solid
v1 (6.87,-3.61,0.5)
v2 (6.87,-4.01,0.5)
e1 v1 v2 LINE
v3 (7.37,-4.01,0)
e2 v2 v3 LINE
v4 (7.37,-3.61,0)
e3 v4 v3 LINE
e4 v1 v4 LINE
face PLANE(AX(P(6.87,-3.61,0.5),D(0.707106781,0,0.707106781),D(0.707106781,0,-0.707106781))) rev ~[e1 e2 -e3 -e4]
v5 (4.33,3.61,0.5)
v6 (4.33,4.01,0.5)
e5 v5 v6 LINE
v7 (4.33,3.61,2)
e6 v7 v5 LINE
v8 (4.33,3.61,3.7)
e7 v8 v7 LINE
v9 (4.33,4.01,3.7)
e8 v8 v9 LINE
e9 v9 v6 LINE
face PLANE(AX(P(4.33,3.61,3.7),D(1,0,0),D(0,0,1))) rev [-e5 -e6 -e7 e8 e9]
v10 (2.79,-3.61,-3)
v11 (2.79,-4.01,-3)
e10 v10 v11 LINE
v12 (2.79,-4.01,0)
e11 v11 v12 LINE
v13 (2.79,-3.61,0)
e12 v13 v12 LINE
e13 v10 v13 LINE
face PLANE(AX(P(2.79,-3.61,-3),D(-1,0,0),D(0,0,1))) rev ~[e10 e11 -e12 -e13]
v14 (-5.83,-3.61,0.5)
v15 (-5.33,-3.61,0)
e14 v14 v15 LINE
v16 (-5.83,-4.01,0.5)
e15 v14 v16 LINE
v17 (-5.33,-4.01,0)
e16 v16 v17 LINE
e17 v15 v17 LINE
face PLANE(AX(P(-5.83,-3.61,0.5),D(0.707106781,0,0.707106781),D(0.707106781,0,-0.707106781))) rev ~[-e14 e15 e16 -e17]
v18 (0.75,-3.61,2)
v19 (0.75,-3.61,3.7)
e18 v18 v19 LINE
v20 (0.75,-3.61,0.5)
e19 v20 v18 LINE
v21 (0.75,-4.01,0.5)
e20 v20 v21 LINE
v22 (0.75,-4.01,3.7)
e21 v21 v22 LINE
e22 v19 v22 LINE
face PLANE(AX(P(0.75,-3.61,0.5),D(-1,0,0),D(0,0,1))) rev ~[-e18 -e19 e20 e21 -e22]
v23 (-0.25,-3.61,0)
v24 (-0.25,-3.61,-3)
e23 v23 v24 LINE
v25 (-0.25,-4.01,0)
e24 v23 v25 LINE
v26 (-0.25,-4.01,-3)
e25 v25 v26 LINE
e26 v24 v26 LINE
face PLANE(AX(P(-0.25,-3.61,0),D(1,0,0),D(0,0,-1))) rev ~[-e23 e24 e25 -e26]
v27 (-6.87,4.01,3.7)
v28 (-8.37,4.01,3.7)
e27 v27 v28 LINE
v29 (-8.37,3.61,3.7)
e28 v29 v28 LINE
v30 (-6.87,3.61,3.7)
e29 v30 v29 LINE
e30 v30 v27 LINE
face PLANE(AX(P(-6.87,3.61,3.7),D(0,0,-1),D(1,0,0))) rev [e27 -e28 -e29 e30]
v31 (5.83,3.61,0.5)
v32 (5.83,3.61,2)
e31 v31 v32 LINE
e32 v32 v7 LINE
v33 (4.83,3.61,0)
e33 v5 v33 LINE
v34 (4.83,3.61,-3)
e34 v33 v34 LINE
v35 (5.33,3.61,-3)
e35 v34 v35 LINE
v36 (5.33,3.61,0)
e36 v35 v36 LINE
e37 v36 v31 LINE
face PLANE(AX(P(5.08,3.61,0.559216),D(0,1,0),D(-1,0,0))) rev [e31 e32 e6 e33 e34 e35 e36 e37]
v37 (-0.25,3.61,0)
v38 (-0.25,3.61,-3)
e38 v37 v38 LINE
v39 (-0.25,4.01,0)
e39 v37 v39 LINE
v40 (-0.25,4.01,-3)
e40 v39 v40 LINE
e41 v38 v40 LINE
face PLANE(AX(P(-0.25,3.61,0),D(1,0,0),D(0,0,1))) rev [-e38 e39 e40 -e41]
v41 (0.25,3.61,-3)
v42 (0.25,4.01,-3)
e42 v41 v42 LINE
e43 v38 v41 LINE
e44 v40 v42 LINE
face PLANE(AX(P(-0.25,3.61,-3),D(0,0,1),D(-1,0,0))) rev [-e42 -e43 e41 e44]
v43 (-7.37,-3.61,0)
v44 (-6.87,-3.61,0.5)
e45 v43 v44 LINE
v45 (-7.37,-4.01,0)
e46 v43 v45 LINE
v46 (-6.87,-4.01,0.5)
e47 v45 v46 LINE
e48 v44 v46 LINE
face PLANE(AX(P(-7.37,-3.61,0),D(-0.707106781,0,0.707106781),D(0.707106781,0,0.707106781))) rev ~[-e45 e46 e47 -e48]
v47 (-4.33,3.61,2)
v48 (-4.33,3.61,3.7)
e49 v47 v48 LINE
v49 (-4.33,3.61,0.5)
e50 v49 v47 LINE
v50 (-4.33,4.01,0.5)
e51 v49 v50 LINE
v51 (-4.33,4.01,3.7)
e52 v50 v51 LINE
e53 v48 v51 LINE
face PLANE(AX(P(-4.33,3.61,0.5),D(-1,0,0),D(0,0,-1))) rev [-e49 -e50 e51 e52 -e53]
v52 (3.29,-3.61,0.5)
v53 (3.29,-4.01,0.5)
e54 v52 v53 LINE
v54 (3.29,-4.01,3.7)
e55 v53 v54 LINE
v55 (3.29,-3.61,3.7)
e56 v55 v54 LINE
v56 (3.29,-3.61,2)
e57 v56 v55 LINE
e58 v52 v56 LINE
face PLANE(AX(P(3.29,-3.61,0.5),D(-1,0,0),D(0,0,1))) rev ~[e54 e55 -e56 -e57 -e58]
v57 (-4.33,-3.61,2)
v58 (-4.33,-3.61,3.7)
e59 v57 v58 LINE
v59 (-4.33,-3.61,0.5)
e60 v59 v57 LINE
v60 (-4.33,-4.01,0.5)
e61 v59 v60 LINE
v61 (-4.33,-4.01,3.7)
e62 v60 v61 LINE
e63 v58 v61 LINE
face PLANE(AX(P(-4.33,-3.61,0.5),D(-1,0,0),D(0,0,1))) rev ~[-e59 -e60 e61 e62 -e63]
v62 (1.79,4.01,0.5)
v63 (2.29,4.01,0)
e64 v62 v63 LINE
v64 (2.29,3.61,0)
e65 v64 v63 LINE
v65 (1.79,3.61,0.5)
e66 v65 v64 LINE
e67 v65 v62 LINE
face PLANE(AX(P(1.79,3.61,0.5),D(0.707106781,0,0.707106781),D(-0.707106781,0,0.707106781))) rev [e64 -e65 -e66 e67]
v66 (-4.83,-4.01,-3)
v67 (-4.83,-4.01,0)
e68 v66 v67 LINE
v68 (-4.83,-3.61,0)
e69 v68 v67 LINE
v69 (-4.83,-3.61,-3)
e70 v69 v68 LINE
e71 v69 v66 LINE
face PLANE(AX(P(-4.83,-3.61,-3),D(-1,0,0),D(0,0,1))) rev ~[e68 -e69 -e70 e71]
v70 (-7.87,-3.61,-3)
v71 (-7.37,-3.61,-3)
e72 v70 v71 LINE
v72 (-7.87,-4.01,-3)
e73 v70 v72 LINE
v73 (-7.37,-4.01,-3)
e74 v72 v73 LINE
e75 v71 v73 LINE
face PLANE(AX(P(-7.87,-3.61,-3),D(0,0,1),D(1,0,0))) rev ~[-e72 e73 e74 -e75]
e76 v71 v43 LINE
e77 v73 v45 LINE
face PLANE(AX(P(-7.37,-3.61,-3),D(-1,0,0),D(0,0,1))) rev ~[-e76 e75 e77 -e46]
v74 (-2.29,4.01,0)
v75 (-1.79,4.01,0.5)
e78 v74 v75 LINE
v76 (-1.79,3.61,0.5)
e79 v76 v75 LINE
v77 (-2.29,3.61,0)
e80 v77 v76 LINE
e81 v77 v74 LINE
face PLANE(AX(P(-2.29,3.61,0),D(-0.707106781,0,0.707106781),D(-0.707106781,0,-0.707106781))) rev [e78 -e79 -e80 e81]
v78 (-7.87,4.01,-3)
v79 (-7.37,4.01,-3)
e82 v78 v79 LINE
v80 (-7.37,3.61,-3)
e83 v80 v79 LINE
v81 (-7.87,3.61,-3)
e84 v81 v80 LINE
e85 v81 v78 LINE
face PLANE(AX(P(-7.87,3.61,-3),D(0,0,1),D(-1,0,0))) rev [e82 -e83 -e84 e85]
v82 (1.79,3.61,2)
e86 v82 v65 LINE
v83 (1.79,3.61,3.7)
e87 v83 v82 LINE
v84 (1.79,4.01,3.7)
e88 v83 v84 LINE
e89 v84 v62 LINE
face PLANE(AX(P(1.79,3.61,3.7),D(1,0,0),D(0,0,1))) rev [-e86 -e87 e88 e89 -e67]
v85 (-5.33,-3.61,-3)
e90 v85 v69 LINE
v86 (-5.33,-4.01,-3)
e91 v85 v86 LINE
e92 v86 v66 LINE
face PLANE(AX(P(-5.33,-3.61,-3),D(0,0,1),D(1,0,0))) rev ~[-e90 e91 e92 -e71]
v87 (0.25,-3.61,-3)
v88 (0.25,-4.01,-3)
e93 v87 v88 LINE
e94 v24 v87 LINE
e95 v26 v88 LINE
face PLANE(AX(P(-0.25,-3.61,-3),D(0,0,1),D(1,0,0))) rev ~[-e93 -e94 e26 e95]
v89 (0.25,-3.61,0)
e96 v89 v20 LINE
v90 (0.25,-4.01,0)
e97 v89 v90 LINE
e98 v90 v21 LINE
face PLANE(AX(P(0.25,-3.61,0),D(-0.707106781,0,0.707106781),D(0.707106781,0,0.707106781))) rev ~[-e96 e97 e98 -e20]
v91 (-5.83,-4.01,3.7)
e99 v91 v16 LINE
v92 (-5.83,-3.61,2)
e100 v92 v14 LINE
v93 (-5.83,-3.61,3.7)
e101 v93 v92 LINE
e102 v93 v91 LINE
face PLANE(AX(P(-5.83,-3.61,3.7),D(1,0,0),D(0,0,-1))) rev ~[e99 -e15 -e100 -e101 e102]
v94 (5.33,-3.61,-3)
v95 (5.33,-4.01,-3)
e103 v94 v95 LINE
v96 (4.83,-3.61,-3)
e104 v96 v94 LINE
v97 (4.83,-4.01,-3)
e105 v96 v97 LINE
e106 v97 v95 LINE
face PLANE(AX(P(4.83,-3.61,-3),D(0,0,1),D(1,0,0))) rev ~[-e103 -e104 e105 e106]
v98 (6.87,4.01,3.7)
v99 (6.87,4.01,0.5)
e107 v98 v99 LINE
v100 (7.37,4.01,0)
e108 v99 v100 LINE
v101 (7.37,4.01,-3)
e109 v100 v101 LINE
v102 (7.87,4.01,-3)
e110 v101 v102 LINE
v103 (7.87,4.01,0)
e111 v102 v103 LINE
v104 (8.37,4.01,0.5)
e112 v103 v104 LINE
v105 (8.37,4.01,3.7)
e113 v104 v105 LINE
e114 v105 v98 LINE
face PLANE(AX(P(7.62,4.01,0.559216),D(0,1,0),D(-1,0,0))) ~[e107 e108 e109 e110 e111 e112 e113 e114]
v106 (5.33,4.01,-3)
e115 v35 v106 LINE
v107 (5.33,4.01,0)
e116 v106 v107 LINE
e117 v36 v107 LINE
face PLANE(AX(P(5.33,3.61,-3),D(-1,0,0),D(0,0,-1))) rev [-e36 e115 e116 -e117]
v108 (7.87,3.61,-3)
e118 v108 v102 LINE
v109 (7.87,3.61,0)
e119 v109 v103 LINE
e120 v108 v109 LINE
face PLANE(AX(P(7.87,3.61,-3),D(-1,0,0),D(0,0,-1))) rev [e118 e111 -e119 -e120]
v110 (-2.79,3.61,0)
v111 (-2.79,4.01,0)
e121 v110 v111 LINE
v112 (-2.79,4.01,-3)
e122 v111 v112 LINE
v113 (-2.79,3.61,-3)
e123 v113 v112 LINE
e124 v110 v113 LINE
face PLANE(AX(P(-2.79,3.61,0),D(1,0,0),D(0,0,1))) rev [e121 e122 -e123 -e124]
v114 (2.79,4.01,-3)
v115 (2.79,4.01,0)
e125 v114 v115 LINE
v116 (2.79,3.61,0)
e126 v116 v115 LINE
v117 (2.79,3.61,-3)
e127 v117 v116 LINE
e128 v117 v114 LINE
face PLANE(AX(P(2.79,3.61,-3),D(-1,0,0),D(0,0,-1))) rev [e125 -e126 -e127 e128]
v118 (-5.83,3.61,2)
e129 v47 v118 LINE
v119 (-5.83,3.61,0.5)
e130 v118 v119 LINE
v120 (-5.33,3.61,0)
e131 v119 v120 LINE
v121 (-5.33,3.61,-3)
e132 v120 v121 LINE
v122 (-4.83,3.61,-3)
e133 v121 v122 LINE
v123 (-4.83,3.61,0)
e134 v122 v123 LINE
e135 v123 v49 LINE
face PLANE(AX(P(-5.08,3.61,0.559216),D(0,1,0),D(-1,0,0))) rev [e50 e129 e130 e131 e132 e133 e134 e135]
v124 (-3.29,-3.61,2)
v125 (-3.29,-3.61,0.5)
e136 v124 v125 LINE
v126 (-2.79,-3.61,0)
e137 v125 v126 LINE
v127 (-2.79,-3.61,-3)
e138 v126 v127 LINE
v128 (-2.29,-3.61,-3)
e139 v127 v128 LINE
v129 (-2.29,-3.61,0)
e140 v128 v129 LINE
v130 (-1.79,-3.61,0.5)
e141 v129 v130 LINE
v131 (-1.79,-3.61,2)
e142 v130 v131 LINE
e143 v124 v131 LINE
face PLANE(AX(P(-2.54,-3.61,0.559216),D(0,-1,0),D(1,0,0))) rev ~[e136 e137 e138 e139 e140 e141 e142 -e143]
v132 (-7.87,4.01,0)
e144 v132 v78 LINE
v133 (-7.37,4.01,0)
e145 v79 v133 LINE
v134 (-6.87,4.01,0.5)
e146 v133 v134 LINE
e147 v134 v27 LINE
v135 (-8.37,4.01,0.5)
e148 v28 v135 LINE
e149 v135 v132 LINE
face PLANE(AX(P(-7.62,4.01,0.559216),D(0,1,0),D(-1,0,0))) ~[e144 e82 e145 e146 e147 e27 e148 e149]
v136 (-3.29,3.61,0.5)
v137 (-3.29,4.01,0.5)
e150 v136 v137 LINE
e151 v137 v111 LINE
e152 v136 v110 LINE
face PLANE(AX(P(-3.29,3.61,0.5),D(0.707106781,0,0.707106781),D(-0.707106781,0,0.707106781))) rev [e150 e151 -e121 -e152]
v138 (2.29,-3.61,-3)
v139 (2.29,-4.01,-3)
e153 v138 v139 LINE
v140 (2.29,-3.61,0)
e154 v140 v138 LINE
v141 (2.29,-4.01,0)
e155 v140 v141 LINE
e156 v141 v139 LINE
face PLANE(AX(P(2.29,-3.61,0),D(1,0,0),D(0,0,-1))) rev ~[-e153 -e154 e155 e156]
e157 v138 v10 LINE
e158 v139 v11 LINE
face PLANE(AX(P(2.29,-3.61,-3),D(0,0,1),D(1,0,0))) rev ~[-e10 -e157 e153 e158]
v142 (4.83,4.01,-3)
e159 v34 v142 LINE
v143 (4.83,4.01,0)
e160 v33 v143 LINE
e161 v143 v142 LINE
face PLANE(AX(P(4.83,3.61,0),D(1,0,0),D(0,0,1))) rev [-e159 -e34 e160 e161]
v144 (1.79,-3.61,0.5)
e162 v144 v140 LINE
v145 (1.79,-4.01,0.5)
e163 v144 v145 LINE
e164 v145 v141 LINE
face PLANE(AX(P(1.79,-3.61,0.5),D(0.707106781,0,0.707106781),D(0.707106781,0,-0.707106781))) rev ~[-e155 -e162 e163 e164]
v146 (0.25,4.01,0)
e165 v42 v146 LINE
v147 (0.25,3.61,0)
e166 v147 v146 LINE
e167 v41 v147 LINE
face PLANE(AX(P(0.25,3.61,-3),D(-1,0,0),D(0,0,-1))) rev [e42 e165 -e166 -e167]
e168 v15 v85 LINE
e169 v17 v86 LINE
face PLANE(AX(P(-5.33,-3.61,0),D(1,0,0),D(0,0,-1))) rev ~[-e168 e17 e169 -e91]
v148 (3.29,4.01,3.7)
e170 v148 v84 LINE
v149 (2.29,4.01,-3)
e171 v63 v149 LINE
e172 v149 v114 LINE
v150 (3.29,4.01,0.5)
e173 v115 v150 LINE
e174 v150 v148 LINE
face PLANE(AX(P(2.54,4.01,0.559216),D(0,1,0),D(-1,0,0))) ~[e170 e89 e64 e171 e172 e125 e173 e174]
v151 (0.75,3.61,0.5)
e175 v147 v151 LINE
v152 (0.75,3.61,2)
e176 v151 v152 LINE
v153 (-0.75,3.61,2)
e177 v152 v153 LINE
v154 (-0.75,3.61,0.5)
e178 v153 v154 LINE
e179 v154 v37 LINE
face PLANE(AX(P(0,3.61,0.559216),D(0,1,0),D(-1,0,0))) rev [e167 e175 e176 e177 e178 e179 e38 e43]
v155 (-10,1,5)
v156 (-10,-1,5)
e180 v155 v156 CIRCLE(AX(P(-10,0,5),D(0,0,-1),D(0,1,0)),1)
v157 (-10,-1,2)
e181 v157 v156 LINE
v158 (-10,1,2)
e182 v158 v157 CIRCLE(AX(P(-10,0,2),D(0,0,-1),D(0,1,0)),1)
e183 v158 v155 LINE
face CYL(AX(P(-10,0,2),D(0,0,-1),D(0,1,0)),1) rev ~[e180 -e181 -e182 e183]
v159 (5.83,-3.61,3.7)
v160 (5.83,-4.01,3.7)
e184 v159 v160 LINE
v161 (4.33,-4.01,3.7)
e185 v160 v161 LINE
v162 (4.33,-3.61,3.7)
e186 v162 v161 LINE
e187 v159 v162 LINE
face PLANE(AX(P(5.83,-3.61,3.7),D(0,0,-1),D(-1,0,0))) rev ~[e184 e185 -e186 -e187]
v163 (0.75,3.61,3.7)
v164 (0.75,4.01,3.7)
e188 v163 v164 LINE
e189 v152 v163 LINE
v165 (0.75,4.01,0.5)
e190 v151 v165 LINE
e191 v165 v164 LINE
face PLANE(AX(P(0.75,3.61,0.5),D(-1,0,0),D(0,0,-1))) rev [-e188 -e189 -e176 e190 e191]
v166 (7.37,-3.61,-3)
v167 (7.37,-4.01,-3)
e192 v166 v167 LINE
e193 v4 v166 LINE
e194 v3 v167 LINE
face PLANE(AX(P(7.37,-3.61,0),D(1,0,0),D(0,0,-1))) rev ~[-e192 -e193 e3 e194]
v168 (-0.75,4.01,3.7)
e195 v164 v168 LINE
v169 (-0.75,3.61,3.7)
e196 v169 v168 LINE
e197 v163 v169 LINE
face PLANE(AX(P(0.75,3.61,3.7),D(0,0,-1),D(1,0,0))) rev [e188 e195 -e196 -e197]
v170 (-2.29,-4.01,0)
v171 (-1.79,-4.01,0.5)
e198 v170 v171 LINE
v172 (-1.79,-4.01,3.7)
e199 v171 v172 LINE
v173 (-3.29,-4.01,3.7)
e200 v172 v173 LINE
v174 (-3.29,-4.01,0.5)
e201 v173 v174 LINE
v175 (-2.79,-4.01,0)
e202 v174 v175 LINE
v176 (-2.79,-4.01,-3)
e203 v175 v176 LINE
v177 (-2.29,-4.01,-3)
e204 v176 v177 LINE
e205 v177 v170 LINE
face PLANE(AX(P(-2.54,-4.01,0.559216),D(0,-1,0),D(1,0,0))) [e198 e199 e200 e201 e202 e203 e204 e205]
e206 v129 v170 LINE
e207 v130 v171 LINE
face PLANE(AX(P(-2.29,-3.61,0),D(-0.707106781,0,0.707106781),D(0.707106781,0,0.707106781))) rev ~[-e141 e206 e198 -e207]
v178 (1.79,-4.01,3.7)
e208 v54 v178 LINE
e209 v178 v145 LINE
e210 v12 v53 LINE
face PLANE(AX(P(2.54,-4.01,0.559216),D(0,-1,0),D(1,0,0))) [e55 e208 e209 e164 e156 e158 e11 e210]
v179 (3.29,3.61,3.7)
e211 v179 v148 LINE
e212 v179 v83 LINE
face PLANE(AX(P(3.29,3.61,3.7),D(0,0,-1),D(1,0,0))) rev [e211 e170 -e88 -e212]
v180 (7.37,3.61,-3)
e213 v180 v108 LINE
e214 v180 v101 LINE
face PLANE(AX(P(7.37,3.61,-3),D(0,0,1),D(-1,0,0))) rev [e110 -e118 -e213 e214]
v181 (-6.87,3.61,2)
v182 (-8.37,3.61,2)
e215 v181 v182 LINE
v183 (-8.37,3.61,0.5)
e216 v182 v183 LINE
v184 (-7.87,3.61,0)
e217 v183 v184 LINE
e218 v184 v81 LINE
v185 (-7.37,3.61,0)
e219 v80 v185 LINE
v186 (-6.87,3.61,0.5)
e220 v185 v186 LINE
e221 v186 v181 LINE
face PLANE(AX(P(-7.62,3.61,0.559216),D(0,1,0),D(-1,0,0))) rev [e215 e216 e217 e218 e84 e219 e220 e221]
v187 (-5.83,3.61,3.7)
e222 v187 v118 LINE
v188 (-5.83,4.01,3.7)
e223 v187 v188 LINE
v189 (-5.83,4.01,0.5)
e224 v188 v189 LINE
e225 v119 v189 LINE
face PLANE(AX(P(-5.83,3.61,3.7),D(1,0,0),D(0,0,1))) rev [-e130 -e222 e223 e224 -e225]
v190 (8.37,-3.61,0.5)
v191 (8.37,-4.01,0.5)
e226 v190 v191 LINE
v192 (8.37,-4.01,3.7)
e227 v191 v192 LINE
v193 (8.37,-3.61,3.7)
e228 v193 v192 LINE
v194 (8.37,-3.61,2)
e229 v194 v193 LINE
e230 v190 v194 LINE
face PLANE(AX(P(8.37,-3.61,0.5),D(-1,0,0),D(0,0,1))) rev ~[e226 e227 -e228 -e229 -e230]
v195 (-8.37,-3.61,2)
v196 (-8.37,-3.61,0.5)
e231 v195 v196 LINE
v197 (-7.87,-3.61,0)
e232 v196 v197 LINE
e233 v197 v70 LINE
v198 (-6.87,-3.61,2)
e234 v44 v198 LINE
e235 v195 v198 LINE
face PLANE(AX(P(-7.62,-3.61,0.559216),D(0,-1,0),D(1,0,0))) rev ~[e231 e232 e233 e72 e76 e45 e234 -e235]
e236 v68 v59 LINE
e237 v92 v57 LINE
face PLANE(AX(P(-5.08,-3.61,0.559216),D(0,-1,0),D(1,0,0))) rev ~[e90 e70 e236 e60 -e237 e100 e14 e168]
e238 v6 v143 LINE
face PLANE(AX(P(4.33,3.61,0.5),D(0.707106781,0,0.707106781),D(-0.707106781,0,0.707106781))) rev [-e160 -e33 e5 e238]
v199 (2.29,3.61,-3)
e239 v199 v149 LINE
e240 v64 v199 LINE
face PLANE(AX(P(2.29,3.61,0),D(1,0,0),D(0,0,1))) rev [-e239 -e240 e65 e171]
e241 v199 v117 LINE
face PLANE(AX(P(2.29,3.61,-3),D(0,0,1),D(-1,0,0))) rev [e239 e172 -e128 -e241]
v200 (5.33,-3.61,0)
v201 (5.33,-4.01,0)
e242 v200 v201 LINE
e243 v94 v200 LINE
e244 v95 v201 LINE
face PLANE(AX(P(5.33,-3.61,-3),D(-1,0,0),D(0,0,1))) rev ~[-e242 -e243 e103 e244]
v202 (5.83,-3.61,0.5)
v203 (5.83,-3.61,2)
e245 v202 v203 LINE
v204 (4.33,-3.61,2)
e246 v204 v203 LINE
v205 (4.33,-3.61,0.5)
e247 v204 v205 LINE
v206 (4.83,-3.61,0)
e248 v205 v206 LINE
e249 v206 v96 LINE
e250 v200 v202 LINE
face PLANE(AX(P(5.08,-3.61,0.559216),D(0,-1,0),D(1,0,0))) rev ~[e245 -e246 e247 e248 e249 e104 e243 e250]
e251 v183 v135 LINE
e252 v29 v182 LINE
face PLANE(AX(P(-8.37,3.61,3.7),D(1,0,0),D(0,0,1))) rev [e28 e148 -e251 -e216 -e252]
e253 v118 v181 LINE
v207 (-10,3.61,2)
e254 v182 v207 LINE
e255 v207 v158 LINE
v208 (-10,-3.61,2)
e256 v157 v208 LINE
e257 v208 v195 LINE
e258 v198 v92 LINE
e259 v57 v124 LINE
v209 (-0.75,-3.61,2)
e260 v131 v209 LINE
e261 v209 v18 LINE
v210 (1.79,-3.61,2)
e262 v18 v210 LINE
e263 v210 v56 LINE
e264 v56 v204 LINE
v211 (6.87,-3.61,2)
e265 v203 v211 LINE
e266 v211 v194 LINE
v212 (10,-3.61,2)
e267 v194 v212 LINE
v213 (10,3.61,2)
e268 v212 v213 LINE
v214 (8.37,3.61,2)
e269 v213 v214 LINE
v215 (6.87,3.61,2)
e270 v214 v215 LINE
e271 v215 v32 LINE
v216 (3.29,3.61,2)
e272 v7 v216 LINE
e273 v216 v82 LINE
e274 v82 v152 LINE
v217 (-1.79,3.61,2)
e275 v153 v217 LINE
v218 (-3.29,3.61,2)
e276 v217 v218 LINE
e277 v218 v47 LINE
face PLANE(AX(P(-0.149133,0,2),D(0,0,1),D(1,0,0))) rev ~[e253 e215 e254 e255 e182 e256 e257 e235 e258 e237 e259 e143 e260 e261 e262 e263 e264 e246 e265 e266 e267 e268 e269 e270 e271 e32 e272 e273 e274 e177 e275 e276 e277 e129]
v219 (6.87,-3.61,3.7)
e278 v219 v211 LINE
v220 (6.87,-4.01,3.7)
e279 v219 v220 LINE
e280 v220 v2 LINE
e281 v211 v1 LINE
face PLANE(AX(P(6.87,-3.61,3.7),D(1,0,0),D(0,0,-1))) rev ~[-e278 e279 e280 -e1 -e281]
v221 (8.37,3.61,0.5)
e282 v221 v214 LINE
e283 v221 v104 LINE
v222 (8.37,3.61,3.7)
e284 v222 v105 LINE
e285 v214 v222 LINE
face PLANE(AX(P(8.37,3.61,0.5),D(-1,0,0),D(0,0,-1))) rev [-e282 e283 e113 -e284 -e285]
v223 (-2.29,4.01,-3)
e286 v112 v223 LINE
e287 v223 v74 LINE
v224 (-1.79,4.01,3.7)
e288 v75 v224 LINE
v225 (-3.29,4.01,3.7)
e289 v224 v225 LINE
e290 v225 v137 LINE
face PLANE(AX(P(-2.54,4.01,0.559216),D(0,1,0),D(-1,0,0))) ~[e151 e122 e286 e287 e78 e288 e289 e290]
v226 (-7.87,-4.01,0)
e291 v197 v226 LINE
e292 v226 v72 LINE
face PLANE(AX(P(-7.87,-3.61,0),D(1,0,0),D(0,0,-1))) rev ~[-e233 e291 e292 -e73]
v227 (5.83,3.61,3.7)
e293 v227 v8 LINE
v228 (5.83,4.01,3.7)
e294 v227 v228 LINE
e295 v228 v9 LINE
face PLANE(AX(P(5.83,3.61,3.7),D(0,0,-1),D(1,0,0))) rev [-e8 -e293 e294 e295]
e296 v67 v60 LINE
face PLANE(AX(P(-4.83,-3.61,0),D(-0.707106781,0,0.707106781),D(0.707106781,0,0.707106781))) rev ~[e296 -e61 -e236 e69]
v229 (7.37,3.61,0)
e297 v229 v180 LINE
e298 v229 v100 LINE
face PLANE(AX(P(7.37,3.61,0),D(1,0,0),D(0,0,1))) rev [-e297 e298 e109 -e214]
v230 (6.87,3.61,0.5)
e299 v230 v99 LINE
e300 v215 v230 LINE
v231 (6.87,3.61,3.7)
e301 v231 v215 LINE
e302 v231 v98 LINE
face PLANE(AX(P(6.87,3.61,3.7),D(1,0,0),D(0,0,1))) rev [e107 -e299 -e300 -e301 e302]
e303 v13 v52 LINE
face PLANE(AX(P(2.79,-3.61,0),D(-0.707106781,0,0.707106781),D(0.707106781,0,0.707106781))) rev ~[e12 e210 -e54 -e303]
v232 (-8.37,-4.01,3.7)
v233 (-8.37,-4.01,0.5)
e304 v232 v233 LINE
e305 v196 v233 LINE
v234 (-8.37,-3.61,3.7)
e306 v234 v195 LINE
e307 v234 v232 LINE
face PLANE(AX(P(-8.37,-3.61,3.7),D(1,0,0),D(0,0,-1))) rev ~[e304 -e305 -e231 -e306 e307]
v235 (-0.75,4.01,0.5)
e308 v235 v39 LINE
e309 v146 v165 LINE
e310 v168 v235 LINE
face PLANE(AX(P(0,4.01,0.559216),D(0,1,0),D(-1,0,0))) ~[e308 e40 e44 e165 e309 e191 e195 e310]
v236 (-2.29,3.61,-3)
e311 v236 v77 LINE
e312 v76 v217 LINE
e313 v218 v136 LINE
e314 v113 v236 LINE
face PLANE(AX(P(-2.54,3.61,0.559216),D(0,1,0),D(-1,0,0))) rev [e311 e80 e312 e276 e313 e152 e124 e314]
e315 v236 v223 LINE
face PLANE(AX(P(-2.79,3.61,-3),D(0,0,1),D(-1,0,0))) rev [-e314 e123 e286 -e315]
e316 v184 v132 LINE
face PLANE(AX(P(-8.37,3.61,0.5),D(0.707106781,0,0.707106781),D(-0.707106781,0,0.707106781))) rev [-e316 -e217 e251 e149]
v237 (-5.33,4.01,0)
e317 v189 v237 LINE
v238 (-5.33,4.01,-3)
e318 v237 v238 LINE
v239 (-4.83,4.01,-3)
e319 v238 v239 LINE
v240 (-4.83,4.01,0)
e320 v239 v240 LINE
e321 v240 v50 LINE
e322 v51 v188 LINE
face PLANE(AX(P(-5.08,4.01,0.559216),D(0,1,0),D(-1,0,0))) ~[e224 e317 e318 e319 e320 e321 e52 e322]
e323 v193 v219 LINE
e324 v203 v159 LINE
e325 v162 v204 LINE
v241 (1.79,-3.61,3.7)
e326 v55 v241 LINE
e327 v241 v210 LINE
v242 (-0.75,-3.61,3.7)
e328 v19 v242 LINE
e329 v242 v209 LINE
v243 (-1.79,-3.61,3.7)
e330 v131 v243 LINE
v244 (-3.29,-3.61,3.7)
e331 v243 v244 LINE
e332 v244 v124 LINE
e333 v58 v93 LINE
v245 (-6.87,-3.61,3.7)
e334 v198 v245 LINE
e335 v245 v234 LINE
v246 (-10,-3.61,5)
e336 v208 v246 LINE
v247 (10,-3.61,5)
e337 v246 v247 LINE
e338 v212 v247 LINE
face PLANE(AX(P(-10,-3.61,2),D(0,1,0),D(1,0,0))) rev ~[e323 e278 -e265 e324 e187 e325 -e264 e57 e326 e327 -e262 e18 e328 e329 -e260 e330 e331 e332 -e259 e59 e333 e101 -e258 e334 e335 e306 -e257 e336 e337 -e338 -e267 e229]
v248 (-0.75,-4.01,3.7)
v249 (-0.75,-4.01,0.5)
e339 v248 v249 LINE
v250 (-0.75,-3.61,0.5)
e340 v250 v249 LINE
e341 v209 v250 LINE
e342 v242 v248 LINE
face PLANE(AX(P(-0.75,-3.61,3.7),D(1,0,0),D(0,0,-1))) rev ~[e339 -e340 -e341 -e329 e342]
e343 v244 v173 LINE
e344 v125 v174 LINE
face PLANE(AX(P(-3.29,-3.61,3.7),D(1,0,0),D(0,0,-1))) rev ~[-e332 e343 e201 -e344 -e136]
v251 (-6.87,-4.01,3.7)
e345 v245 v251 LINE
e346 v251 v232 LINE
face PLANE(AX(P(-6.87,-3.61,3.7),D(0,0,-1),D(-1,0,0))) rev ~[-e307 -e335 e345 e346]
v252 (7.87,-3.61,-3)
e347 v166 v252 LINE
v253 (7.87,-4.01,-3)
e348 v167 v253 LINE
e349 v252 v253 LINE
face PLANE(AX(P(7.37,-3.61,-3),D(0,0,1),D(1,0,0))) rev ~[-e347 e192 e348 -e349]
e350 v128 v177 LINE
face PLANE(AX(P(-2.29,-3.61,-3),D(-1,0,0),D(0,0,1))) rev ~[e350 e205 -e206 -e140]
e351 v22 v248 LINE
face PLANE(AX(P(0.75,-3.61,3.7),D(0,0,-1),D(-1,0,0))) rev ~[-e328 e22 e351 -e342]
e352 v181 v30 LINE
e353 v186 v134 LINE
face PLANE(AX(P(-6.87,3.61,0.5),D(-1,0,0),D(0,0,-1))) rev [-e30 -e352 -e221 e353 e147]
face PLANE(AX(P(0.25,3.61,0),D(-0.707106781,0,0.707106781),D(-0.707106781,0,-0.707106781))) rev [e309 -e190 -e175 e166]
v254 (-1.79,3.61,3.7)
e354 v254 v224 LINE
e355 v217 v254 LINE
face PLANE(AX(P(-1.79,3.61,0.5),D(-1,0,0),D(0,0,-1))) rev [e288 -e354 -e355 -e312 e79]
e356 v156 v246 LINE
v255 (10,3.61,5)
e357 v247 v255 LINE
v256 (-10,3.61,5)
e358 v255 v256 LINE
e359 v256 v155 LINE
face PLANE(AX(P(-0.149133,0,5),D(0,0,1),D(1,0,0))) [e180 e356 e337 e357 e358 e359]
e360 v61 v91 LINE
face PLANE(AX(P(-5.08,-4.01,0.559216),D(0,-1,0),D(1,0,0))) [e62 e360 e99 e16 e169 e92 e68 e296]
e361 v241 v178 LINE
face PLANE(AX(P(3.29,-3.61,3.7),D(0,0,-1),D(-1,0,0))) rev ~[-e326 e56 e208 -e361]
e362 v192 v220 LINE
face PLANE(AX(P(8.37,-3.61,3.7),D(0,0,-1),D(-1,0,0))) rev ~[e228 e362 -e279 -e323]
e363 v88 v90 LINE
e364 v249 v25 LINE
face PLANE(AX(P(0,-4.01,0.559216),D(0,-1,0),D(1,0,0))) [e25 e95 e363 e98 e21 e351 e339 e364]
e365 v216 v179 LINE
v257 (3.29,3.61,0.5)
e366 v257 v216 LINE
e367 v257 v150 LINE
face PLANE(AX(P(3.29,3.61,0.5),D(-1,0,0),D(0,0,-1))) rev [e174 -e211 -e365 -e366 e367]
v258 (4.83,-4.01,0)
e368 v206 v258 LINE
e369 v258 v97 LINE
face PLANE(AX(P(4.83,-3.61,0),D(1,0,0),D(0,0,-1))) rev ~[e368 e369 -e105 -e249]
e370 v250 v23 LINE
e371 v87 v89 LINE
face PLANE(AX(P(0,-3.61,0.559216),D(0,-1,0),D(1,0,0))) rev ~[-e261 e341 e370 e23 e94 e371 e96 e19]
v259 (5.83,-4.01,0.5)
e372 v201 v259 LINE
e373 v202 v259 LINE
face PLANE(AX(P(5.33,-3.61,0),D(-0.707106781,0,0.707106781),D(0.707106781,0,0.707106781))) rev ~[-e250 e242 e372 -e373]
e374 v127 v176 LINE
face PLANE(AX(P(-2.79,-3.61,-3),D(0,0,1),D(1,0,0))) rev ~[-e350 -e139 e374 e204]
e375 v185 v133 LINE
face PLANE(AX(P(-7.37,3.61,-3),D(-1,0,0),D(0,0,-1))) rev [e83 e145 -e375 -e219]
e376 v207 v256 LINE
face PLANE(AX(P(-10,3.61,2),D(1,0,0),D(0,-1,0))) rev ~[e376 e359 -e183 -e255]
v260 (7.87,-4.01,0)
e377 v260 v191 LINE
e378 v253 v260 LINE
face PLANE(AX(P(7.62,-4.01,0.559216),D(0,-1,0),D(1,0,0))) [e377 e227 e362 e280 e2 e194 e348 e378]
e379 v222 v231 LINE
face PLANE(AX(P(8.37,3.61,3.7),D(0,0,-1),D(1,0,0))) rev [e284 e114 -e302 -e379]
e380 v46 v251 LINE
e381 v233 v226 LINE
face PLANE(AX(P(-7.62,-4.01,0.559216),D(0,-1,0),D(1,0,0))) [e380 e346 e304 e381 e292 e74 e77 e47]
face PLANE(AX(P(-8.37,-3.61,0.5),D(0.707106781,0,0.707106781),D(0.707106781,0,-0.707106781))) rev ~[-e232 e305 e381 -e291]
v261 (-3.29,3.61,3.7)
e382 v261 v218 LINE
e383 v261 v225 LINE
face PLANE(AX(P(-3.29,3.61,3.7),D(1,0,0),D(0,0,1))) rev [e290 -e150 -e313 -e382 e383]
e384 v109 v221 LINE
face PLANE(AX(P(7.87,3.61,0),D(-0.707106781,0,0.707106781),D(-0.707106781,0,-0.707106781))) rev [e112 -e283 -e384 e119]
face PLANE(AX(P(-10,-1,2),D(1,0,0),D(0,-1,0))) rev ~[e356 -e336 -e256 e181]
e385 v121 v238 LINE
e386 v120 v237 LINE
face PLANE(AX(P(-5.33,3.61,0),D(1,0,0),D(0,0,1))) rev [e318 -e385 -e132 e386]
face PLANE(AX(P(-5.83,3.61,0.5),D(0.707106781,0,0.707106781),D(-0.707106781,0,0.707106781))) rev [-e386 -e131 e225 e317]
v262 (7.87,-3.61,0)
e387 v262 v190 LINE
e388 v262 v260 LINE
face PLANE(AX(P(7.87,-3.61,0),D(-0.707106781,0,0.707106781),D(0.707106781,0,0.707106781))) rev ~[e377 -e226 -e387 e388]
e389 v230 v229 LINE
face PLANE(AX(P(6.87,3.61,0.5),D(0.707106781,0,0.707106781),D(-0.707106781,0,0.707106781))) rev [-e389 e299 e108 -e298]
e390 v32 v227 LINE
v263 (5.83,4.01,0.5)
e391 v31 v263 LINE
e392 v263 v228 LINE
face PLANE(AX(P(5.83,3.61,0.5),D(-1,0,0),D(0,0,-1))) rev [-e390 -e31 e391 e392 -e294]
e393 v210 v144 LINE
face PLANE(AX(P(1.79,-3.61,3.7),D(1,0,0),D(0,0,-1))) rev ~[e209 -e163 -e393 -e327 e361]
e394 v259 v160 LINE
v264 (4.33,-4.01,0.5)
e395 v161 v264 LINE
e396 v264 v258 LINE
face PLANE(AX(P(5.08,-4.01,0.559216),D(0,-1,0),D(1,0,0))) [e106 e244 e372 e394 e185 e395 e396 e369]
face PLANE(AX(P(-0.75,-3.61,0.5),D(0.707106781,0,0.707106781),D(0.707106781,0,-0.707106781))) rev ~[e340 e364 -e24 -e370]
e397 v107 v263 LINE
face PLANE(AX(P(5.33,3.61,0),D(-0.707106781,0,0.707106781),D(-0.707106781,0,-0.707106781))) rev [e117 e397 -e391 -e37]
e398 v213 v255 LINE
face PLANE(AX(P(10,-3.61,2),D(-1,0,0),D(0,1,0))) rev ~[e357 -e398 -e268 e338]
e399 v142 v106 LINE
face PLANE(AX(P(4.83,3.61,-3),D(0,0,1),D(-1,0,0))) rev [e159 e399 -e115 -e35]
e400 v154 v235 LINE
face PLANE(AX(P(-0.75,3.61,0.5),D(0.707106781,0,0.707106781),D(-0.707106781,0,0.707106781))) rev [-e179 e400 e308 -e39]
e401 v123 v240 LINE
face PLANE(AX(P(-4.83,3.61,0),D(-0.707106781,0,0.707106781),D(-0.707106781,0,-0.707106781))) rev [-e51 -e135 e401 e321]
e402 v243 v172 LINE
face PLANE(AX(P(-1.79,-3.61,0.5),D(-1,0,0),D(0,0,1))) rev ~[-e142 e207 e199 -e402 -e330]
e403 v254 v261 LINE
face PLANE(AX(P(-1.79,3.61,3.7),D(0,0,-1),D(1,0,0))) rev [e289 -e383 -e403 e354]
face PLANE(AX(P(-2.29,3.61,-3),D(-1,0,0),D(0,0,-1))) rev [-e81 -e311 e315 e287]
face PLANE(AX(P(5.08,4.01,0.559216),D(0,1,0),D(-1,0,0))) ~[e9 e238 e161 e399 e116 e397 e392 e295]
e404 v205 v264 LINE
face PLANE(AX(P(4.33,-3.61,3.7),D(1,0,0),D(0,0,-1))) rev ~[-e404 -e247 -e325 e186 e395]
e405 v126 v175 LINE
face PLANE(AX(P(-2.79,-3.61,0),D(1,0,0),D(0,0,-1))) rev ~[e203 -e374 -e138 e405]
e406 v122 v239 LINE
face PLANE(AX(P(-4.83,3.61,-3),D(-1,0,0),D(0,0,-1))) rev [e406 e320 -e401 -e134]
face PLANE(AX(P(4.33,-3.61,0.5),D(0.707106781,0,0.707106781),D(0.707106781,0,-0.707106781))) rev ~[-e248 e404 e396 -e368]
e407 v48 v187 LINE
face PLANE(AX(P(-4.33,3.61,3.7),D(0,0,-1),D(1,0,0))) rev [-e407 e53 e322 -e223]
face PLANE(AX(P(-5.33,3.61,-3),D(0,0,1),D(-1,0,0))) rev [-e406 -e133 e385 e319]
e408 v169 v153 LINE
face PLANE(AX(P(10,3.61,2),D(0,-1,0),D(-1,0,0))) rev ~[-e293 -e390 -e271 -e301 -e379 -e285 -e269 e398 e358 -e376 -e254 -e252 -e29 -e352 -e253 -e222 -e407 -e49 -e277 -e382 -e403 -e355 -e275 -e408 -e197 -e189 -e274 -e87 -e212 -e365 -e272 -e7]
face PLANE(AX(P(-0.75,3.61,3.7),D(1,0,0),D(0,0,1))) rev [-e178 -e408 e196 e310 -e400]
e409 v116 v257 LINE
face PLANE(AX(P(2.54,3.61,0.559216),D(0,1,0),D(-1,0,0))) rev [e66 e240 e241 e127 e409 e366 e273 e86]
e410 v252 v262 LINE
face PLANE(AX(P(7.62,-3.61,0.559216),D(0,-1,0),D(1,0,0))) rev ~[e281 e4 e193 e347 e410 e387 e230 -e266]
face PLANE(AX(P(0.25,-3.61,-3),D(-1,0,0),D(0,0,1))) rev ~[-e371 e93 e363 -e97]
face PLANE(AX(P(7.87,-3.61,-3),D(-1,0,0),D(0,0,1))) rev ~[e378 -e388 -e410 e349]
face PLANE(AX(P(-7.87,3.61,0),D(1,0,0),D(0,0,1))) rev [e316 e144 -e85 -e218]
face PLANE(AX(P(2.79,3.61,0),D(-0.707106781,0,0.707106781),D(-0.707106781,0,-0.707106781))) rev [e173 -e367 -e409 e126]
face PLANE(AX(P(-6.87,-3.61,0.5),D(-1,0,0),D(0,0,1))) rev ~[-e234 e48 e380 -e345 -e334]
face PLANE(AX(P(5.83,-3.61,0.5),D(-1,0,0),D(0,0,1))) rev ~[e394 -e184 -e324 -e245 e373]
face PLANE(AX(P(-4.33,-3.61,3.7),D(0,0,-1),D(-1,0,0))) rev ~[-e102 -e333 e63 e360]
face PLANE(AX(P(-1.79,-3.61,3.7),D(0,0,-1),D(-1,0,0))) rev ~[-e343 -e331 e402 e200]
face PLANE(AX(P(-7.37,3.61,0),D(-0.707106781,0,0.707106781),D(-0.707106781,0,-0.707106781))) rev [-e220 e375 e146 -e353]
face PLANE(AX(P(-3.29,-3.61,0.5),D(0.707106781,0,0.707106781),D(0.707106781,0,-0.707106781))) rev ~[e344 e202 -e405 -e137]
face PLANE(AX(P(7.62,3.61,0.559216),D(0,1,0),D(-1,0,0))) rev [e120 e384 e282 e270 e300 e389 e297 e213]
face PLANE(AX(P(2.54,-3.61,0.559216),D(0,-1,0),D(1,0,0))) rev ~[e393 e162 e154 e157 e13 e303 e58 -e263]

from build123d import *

# Parameters (mm, degrees)
F1_START = 2
F1_DEPTH = 3
F3_DEPTH = 0.4


# Not quite as in the source:
# - a pattern or mirror of a feature is missing from the dataset's text; its kind, count and spacing are read off the source's solid


with BuildPart() as f1:
    # F0 (on Top) → F1 (new body)
    with BuildSketch(Plane.XY.offset(F1_START)):
        with BuildLine():
            Line((10, 3.61), (-10, 3.61))
            Line((-10, 3.61), (-10, 1))
            ThreePointArc((-10, 1), (-9, 0), (-10, -1))
            Line((-10, -1), (-10, -3.61))
            Line((-10, -3.61), (10, -3.61))
            Line((10, -3.61), (10, 3.61))
        make_face()
    extrude(amount=F1_DEPTH)

    # F2 (on face) → F3 (join)
    with BuildSketch(Plane.XZ.offset(3.61)):
        Polygon((-6.87, 3.7), (-8.37, 3.7), (-8.37, 0.5), (-7.87, 0), (-7.87, -3), (-7.37, -3), (-7.37, 0), (-6.87, 0.5), align=None)
        Polygon((-5.83, 0.5), (-5.33, 0), (-5.33, -3), (-4.83, -3), (-4.83, 0), (-4.33, 0.5), (-4.33, 3.7), (-5.83, 3.7), align=None)
        Polygon((-3.29, 0.5), (-2.79, 0), (-2.79, -3), (-2.29, -3), (-2.29, 0), (-1.79, 0.5), (-1.79, 3.7), (-3.29, 3.7), align=None)
        Polygon((-0.75, 0.5), (-0.25, 0), (-0.25, -3), (0.25, -3), (0.25, 0), (0.75, 0.5), (0.75, 3.7), (-0.75, 3.7), align=None)
        Polygon((1.79, 0.5), (2.29, 0), (2.29, -3), (2.79, -3), (2.79, 0), (3.29, 0.5), (3.29, 3.7), (1.79, 3.7), align=None)
        Polygon((4.33, 0.5), (4.83, 0), (4.83, -3), (5.33, -3), (5.33, 0), (5.83, 0.5), (5.83, 3.7), (4.33, 3.7), align=None)
        Polygon((6.87, 0.5), (7.37, 0), (7.37, -3), (7.87, -3), (7.87, 0), (8.37, 0.5), (8.37, 3.7), (6.87, 3.7), align=None)
    f3 = extrude(amount=F3_DEPTH)

    # F3_copies: F3 across plane
    add(f3.mirror(Plane.ZX))


solid = f1.part
